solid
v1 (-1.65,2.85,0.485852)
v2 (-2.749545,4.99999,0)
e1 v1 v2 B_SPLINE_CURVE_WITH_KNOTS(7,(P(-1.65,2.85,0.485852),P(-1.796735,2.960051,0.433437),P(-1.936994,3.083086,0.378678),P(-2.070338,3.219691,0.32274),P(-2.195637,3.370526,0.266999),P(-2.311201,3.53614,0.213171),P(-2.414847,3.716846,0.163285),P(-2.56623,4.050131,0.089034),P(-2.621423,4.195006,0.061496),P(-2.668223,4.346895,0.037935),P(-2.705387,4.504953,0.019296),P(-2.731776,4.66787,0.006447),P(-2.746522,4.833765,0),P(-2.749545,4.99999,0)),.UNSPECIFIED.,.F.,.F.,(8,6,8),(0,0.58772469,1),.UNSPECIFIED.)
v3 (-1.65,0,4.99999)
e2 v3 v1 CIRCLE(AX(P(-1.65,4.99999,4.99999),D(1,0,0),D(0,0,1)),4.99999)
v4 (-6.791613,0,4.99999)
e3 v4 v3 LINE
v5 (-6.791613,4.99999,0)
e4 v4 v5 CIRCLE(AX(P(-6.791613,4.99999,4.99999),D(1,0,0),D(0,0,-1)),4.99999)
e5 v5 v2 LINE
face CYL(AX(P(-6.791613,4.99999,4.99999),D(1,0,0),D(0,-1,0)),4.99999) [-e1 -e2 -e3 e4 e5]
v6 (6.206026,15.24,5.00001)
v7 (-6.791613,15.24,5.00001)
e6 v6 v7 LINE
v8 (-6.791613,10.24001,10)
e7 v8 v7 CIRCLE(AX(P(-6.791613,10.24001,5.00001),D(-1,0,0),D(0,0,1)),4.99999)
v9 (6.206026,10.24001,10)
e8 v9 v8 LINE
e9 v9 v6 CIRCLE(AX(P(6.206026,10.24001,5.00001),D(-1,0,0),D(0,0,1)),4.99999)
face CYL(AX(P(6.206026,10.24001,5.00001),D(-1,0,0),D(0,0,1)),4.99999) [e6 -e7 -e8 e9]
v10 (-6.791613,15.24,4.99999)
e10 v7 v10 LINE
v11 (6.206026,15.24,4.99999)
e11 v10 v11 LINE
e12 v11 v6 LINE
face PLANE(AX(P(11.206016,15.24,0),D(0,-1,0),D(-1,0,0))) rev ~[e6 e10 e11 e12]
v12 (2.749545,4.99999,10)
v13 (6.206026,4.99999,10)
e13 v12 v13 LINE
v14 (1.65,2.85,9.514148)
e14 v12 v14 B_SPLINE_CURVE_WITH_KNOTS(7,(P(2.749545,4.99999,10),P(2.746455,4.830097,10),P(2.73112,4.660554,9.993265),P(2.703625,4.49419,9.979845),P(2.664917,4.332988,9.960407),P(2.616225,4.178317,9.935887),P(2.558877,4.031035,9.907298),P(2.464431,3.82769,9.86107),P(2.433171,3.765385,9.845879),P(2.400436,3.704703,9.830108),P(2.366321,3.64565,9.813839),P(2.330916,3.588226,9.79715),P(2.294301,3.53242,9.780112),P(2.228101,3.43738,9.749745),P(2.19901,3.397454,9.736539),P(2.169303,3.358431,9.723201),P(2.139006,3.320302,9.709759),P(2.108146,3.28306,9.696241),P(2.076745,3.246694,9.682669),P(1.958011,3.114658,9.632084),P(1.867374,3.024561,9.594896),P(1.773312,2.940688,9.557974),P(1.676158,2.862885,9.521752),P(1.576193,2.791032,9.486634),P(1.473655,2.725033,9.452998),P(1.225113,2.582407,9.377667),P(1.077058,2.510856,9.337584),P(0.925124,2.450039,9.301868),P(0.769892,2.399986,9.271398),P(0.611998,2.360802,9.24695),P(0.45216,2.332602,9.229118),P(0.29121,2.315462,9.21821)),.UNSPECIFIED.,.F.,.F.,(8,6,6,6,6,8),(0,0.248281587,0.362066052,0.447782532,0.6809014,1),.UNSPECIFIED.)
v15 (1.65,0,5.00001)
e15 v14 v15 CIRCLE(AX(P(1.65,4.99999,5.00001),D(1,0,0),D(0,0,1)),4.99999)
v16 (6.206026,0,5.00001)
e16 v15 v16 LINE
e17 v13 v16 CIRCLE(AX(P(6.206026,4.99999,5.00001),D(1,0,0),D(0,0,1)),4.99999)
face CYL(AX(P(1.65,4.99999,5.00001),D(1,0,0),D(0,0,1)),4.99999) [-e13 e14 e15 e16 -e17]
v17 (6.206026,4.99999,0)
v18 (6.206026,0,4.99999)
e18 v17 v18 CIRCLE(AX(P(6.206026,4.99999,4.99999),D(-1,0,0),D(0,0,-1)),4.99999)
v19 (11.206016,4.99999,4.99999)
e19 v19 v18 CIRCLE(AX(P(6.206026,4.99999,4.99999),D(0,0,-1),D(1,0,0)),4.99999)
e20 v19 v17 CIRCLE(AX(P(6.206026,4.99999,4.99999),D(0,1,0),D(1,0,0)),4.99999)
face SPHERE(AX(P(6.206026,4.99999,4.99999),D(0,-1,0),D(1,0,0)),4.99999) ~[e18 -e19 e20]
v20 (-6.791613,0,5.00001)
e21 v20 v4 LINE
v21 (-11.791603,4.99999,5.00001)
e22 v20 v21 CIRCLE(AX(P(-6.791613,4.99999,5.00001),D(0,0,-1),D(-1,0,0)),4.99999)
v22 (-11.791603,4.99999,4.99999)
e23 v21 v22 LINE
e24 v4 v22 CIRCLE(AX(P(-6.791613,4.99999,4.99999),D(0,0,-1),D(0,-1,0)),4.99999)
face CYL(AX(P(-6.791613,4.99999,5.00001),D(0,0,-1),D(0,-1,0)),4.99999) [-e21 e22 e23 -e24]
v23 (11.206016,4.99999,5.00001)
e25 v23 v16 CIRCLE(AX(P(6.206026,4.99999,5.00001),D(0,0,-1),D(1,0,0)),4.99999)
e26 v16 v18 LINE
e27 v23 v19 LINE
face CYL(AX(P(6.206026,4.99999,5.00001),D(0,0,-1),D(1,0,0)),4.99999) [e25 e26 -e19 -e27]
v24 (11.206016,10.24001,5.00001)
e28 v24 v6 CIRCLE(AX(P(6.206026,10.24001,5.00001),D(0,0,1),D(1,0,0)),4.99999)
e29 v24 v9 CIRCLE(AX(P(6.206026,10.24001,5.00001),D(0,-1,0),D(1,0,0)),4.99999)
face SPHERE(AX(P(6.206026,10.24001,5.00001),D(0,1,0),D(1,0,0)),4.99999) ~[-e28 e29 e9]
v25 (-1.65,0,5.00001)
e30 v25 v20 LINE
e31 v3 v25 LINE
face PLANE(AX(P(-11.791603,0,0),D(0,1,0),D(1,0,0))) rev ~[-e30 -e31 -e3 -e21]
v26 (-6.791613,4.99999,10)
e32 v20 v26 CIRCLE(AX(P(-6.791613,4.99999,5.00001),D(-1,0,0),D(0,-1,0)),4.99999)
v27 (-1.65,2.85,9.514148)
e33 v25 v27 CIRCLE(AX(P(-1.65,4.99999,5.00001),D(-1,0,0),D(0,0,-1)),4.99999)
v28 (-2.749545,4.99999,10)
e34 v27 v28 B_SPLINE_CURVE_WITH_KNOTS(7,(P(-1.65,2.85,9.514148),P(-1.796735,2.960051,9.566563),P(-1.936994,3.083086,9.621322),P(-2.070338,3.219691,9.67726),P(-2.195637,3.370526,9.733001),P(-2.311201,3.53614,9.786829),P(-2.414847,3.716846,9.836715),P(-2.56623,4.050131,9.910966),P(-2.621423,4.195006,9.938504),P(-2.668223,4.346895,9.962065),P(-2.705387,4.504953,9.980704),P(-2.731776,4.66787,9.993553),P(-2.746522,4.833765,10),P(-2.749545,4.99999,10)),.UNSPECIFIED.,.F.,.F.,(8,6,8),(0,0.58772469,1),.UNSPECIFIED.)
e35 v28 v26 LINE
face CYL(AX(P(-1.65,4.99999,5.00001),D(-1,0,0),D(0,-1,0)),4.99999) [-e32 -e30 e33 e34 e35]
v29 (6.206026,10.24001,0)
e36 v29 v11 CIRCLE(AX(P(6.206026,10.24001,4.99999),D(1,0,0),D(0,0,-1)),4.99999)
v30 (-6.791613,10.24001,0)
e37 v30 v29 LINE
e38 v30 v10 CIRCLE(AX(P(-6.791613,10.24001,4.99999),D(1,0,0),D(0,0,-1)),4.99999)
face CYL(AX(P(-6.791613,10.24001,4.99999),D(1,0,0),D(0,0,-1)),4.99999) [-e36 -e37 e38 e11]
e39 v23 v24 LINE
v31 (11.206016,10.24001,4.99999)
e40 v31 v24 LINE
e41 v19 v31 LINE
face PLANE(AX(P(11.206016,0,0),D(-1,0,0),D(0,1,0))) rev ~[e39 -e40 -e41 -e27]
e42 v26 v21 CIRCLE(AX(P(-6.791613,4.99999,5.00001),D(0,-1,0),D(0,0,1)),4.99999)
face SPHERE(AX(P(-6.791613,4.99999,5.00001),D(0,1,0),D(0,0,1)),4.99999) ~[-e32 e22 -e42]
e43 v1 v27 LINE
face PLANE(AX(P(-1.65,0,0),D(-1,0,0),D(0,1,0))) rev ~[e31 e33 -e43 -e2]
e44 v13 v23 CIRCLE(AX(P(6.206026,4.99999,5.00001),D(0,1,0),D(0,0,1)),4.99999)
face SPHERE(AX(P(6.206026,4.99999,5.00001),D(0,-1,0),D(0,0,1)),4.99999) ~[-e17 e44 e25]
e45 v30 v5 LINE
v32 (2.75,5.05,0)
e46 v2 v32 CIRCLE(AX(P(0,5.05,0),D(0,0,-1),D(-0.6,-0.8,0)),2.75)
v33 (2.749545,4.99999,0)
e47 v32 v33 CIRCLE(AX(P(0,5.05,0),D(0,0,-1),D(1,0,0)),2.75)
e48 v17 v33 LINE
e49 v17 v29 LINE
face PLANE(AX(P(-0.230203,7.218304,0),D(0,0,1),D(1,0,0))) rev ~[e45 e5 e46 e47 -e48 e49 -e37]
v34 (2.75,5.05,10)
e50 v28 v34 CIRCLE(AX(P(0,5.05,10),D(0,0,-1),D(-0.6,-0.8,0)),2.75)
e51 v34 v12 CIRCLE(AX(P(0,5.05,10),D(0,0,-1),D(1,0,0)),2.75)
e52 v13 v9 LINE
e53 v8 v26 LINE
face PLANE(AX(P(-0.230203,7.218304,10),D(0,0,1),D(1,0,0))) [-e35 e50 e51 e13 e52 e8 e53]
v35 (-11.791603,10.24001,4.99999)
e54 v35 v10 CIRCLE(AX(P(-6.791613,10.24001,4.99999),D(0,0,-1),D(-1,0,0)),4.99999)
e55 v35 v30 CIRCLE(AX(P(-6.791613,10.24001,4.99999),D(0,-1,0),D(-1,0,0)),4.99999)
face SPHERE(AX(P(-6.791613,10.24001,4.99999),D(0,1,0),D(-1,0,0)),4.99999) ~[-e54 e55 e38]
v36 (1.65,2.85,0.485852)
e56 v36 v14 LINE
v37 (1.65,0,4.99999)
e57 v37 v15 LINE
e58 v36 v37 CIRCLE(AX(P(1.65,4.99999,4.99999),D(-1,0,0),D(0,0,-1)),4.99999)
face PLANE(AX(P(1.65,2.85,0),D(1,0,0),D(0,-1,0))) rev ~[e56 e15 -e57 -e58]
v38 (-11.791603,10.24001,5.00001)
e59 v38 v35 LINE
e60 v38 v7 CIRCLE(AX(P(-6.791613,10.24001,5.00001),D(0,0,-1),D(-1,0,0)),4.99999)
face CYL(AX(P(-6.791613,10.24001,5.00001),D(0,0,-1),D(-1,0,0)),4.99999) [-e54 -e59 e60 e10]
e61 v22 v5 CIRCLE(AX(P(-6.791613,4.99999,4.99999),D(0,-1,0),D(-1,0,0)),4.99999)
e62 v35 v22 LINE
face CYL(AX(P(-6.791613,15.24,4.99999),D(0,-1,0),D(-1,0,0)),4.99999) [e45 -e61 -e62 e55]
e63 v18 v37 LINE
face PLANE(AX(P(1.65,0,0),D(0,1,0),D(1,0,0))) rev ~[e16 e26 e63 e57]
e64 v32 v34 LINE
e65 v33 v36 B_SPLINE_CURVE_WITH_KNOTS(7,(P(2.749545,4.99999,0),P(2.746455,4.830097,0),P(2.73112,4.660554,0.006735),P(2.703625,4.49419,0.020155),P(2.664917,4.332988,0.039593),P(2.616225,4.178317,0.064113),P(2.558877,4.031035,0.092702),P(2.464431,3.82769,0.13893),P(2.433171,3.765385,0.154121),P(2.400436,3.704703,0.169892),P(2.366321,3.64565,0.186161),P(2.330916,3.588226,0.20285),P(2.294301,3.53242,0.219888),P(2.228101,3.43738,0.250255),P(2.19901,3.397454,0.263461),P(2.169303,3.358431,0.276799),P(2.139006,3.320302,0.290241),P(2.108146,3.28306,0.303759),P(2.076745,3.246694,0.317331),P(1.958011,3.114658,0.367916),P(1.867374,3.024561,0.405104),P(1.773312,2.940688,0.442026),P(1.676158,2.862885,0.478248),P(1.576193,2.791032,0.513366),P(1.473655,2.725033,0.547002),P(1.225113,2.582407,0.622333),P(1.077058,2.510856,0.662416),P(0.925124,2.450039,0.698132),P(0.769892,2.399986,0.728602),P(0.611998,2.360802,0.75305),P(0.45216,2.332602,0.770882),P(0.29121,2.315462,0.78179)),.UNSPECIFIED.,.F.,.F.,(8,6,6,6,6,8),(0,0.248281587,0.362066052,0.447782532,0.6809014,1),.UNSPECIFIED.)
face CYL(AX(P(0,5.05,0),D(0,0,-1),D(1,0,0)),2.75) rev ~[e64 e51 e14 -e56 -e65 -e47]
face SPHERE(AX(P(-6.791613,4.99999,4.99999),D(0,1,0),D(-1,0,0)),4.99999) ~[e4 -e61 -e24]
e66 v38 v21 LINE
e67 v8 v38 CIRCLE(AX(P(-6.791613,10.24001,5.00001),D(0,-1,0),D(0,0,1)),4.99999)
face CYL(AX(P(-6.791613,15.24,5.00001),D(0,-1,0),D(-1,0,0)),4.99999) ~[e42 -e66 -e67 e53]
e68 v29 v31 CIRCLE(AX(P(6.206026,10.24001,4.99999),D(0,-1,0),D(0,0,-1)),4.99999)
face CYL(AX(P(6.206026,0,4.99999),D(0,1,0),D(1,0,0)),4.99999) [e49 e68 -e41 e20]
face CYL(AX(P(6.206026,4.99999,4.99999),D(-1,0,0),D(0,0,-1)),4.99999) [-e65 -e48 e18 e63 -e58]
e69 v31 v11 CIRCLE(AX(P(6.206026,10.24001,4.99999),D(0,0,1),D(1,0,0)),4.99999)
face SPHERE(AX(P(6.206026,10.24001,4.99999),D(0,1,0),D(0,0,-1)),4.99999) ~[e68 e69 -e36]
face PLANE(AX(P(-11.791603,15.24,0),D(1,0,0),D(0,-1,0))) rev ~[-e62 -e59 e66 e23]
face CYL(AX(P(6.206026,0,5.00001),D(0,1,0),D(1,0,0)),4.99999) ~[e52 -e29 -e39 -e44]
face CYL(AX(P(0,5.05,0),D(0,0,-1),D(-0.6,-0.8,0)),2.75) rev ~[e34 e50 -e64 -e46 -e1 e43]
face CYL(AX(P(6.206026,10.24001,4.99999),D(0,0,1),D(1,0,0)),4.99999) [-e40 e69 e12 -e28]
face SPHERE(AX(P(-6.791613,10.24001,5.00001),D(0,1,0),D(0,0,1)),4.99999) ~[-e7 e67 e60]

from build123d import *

# Parameters (mm, degrees)
F1_DEPTH = 10
F2_R     = 4.99999
F3_R     = 4.99999


# Not quite as in the source:
# - a fillet or chamfer is up to 0.001 mm smaller than in the source, because OpenCascade refuses the exact size


with BuildPart() as f1:
    # F0 (on Top) → F1 (new body)
    with BuildSketch(Plane.XY):
        with BuildLine():
            Line((-11.7916028897, 0), (-1.65, 0))
            Line((-1.65, 0), (-1.65, 2.85))
            ThreePointArc((-1.65, 2.85), (-1.2298373876, 7.5096747752), (2.75, 5.05))
            ThreePointArc((2.75, 5.05), (2.4596747752, 3.8201626124), (1.65, 2.85))
            Line((1.65, 2.85), (1.65, 0))
            Line((1.65, 0), (11.2060164511, 0))
            Line((11.2060164511, 0), (11.2060164511, 15.24))
            Line((11.2060164511, 15.24), (-11.7916028897, 15.24))
            Line((-11.7916028897, 15.24), (-11.7916028897, 0))
        make_face()
    extrude(amount=F1_DEPTH)

    # F2 (radius 5 in the source; OpenCascade refuses exactly that, so slightly less here)
    f2_edges = [f1.edges().sort_by_distance(p)[0] for p in [
        (11.206016, 7.62, 10),
        (11.206016, 7.62, 0),
        (-11.791603, 7.62, 0),
        (-11.791603, 7.62, 10),
    ]]
    fillet(f2_edges, radius=F2_R)

    # F3 (radius 5 in the source; OpenCascade refuses exactly that, so slightly less here)
    f3_edges = [f1.edges().sort_by_distance(p)[0] for p in [
        (-0.292793, 15.24, 10),
        (-10.32714, 0, 1.464463),
        (9.741553, 0, 1.464463),
    ]]
    fillet(f3_edges, radius=F3_R)


solid = f1.part
